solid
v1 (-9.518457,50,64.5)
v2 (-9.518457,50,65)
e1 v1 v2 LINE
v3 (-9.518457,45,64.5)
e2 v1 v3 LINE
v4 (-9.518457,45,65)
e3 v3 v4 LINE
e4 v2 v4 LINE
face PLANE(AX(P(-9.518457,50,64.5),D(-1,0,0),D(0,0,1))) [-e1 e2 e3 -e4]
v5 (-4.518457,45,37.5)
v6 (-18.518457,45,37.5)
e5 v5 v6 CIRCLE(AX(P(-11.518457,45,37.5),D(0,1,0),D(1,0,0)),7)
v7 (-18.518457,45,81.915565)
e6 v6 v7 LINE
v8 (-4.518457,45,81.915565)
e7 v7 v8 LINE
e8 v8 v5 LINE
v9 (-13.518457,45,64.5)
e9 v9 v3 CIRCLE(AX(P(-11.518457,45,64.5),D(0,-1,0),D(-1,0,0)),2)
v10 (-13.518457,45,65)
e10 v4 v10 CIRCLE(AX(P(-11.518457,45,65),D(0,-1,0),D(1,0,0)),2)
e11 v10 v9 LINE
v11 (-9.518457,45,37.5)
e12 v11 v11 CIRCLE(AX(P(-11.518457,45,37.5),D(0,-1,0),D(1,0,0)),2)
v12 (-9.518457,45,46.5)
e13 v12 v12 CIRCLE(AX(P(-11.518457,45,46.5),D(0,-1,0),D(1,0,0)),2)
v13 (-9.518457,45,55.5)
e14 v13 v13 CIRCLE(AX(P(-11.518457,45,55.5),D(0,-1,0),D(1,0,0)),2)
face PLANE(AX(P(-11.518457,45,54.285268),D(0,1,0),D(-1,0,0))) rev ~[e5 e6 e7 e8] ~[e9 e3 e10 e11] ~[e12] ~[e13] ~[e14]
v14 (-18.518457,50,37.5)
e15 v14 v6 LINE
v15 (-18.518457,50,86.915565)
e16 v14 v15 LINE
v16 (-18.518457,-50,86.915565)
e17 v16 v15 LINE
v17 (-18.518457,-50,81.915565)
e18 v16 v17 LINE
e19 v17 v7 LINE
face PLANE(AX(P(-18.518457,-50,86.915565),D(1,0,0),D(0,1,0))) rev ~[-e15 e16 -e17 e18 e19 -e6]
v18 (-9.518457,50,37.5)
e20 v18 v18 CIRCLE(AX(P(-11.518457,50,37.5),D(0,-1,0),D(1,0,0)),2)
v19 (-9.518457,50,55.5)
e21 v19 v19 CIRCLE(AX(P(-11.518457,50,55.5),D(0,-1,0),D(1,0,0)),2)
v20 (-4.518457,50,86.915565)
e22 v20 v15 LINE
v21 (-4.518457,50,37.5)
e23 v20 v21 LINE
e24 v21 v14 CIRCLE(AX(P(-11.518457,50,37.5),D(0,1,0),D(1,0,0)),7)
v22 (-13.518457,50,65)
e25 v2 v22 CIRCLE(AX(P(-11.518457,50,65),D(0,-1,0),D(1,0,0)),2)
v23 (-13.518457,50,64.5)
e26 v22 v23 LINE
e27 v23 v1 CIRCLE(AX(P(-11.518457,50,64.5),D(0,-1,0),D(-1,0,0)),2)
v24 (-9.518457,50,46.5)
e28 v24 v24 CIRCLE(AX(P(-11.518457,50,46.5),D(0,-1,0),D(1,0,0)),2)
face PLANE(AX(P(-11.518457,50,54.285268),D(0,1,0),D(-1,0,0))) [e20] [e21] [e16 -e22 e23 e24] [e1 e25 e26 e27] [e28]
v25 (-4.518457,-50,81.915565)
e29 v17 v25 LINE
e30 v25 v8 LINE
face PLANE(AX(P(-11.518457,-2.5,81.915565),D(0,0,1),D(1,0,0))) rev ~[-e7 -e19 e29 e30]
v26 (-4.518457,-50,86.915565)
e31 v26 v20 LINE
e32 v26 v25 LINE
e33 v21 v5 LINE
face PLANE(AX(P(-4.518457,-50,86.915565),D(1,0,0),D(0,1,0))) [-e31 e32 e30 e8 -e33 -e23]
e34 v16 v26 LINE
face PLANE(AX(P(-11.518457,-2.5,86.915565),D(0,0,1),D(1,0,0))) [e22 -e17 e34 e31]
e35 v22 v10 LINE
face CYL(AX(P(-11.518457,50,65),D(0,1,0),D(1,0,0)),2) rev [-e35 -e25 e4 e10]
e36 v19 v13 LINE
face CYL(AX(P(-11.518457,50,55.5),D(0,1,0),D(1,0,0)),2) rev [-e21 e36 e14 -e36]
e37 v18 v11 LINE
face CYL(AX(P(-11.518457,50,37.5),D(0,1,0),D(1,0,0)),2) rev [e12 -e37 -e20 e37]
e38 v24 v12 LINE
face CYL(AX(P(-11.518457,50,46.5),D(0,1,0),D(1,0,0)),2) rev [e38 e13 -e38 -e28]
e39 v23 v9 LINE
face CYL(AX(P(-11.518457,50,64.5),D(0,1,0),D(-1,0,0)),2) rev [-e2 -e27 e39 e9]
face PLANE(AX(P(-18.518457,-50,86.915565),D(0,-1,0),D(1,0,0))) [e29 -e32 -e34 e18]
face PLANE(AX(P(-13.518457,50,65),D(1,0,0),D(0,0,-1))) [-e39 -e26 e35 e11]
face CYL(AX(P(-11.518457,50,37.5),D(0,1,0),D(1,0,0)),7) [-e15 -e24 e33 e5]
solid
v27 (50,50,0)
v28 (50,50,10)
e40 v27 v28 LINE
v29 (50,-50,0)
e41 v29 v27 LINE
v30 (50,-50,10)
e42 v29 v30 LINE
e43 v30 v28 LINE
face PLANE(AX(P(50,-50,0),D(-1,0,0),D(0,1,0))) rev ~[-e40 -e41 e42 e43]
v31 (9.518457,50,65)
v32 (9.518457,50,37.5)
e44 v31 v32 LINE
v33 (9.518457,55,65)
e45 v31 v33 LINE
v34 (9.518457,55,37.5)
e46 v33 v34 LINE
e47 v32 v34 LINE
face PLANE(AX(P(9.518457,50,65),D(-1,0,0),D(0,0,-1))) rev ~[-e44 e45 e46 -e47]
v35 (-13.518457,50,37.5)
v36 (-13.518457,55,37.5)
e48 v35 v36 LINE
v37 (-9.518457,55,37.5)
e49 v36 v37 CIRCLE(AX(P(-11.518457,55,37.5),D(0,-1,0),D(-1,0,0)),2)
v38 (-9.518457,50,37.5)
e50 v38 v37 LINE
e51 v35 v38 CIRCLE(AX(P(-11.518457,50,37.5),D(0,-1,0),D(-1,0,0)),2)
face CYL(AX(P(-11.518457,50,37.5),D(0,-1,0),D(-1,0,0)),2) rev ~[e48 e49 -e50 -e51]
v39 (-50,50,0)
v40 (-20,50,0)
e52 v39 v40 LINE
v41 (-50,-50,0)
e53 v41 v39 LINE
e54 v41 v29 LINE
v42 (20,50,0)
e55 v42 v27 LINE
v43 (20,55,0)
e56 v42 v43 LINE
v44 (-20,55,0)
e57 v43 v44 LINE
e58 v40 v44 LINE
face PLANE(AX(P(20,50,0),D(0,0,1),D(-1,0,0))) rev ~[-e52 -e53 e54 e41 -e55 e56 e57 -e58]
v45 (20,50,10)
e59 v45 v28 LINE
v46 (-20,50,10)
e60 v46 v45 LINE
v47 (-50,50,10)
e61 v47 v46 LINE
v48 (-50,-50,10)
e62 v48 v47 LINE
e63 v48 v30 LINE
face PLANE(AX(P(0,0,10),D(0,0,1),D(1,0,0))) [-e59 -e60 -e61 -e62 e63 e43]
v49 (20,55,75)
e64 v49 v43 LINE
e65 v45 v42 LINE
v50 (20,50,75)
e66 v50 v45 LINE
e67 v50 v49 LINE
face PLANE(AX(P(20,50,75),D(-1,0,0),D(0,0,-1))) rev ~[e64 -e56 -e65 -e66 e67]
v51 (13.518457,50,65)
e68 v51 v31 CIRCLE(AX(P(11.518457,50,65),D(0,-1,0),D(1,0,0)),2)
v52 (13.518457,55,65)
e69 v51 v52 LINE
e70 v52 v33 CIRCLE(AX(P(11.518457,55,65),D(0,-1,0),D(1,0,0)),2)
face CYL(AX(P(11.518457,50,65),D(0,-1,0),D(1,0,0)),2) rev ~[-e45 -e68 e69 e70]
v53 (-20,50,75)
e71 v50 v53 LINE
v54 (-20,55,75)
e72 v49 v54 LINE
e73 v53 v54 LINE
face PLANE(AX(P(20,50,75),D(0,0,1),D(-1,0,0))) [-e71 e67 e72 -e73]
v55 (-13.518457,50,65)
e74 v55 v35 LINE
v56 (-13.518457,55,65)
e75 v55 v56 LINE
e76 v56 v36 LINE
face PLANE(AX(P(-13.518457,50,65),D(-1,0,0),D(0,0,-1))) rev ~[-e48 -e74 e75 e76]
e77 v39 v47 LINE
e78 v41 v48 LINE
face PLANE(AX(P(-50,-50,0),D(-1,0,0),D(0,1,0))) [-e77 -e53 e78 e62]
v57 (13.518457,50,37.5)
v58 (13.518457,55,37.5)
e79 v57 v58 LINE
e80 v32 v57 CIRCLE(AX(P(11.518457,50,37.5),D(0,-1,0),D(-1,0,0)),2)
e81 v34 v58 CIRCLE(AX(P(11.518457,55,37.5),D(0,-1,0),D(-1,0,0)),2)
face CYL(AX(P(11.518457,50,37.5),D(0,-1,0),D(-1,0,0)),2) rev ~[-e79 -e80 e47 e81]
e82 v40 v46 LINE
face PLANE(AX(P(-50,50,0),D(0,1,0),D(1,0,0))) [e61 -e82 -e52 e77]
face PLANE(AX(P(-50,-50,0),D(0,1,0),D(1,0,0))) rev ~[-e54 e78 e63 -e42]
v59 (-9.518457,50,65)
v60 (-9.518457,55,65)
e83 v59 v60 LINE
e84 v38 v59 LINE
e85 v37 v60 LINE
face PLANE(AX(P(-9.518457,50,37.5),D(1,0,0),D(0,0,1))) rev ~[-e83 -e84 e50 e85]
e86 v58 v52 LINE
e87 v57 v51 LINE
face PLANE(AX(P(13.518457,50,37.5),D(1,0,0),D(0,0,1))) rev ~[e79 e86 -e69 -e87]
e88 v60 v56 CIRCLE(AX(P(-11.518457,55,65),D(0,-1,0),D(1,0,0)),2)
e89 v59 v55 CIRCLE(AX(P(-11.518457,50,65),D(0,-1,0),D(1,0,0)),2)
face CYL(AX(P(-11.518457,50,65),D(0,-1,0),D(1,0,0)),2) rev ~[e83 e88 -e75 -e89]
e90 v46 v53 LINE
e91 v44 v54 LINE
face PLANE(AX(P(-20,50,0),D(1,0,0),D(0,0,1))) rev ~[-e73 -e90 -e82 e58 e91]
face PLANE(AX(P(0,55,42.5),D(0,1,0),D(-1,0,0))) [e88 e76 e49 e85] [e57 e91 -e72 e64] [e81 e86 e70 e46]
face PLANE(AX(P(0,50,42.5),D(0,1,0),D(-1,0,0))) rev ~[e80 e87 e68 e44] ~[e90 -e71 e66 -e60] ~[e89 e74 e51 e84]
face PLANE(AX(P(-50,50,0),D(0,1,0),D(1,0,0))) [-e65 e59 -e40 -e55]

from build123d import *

# Parameters (mm, degrees)
F3_W      = 100
F3_H      = 100
F4_DEPTH  = 10
F5_W      = 40
F5_H      = 65
F5_H_2    = 10
F6_DEPTH  = 5
F7_W      = 14
F7_H      = 6.915564537
F7_H_2    = 5
F8_DEPTH  = 5
F9_W      = 14
F9_H      = 95
F10_DEPTH = 5


with BuildPart() as f4:
    # F3 (on Top) → F4 (new body)
    with BuildSketch(Plane.XY):
        Rectangle(F3_W, F3_H)
    extrude(amount=F4_DEPTH)

    # F5 (on face) → F6 (join)
    with BuildSketch(Plane(origin=(0, 50, 0), x_dir=(-1, 0, 0), z_dir=(0, 1, 0))):
        with Locations((0, 42.5)):
            Rectangle(F5_W, F5_H)
        with BuildLine():
            Line((-13.518457301, 37.5), (-13.518457301, 65))
            ThreePointArc((-13.518457301, 65), (-11.518457301, 67), (-9.518457301, 65))
            Line((-9.518457301, 65), (-9.518457301, 37.5))
            ThreePointArc((-9.518457301, 37.5), (-11.518457301, 35.5), (-13.518457301, 37.5))
        make_face(mode=Mode.SUBTRACT)
        with BuildLine():
            Line((9.518457301, 37.5), (9.518457301, 65))
            ThreePointArc((9.518457301, 65), (11.518457301, 67), (13.518457301, 65))
            Line((13.518457301, 65), (13.518457301, 37.5))
            ThreePointArc((13.518457301, 37.5), (11.518457301, 35.5), (9.518457301, 37.5))
        make_face(mode=Mode.SUBTRACT)
        with Locations((0, 5)):
            Rectangle(F5_W, F5_H_2)
    extrude(amount=F6_DEPTH)


with BuildPart() as f8:
    # F7 (on face) → F8 (new body)
    with BuildSketch(Plane(origin=(0, 50, 0), x_dir=(-1, 0, 0), z_dir=(0, 1, 0))):
        with BuildLine():
            Line((4.518457301, 75), (4.518457301, 37.5))
            ThreePointArc((4.518457301, 37.5), (11.518457301, 30.5), (18.518457301, 37.5))
            Line((18.518457301, 37.5), (18.518457301, 75))
            Line((18.518457301, 75), (4.518457301, 75))
        make_face()
        with BuildLine():
            Line((13.518457301, 46.5), (13.518457301, 37.5))
            ThreePointArc((13.518457301, 37.5), (11.518457301, 35.5), (9.518457301, 37.5))
            Line((9.518457301, 37.5), (9.518457301, 46.5))
            Line((9.518457301, 46.5), (9.518457301, 55.5))
            Line((9.518457301, 55.5), (9.518457301, 64.5))
            Line((9.518457301, 64.5), (9.518457301, 65))
            ThreePointArc((9.518457301, 65), (11.518457301, 67), (13.518457301, 65))
            Line((13.518457301, 65), (13.518457301, 64.5))
            Line((13.518457301, 64.5), (13.518457301, 55.5))
            Line((13.518457301, 55.5), (13.518457301, 46.5))
        make_face(mode=Mode.SUBTRACT)
        with Locations((11.518457301, 78.4577822685)):
            Rectangle(F7_W, F7_H)
        with Locations((11.518457301, 84.415564537)):
            Rectangle(F7_W, F7_H_2)
        with BuildLine():
            ThreePointArc((9.518457301, 37.5), (11.518457301, 39.5), (13.518457301, 37.5))
            Line((13.518457301, 37.5), (13.518457301, 46.5))
            ThreePointArc((13.518457301, 46.5), (11.518457301, 44.5), (9.518457301, 46.5))
            Line((9.518457301, 46.5), (9.518457301, 37.5))
        make_face()
        with BuildLine():
            ThreePointArc((9.518457301, 46.5), (11.518457301, 48.5), (13.518457301, 46.5))
            Line((13.518457301, 46.5), (13.518457301, 55.5))
            ThreePointArc((13.518457301, 55.5), (11.518457301, 53.5), (9.518457301, 55.5))
            Line((9.518457301, 55.5), (9.518457301, 46.5))
        make_face()
        with BuildLine():
            ThreePointArc((9.518457301, 55.5), (11.518457301, 57.5), (13.518457301, 55.5))
            Line((13.518457301, 55.5), (13.518457301, 64.5))
            ThreePointArc((13.518457301, 64.5), (11.518457301, 62.5), (9.518457301, 64.5))
            Line((9.518457301, 64.5), (9.518457301, 55.5))
        make_face()
    extrude(amount=-F8_DEPTH)

    # F9 (on face) → F10 (join)
    with BuildSketch(Plane.XY.offset(86.915564537)):
        with Locations((-11.518457301, -2.5)):
            Rectangle(F9_W, F9_H)
    extrude(amount=-F10_DEPTH)


solid = Compound([f4.part, f8.part])
